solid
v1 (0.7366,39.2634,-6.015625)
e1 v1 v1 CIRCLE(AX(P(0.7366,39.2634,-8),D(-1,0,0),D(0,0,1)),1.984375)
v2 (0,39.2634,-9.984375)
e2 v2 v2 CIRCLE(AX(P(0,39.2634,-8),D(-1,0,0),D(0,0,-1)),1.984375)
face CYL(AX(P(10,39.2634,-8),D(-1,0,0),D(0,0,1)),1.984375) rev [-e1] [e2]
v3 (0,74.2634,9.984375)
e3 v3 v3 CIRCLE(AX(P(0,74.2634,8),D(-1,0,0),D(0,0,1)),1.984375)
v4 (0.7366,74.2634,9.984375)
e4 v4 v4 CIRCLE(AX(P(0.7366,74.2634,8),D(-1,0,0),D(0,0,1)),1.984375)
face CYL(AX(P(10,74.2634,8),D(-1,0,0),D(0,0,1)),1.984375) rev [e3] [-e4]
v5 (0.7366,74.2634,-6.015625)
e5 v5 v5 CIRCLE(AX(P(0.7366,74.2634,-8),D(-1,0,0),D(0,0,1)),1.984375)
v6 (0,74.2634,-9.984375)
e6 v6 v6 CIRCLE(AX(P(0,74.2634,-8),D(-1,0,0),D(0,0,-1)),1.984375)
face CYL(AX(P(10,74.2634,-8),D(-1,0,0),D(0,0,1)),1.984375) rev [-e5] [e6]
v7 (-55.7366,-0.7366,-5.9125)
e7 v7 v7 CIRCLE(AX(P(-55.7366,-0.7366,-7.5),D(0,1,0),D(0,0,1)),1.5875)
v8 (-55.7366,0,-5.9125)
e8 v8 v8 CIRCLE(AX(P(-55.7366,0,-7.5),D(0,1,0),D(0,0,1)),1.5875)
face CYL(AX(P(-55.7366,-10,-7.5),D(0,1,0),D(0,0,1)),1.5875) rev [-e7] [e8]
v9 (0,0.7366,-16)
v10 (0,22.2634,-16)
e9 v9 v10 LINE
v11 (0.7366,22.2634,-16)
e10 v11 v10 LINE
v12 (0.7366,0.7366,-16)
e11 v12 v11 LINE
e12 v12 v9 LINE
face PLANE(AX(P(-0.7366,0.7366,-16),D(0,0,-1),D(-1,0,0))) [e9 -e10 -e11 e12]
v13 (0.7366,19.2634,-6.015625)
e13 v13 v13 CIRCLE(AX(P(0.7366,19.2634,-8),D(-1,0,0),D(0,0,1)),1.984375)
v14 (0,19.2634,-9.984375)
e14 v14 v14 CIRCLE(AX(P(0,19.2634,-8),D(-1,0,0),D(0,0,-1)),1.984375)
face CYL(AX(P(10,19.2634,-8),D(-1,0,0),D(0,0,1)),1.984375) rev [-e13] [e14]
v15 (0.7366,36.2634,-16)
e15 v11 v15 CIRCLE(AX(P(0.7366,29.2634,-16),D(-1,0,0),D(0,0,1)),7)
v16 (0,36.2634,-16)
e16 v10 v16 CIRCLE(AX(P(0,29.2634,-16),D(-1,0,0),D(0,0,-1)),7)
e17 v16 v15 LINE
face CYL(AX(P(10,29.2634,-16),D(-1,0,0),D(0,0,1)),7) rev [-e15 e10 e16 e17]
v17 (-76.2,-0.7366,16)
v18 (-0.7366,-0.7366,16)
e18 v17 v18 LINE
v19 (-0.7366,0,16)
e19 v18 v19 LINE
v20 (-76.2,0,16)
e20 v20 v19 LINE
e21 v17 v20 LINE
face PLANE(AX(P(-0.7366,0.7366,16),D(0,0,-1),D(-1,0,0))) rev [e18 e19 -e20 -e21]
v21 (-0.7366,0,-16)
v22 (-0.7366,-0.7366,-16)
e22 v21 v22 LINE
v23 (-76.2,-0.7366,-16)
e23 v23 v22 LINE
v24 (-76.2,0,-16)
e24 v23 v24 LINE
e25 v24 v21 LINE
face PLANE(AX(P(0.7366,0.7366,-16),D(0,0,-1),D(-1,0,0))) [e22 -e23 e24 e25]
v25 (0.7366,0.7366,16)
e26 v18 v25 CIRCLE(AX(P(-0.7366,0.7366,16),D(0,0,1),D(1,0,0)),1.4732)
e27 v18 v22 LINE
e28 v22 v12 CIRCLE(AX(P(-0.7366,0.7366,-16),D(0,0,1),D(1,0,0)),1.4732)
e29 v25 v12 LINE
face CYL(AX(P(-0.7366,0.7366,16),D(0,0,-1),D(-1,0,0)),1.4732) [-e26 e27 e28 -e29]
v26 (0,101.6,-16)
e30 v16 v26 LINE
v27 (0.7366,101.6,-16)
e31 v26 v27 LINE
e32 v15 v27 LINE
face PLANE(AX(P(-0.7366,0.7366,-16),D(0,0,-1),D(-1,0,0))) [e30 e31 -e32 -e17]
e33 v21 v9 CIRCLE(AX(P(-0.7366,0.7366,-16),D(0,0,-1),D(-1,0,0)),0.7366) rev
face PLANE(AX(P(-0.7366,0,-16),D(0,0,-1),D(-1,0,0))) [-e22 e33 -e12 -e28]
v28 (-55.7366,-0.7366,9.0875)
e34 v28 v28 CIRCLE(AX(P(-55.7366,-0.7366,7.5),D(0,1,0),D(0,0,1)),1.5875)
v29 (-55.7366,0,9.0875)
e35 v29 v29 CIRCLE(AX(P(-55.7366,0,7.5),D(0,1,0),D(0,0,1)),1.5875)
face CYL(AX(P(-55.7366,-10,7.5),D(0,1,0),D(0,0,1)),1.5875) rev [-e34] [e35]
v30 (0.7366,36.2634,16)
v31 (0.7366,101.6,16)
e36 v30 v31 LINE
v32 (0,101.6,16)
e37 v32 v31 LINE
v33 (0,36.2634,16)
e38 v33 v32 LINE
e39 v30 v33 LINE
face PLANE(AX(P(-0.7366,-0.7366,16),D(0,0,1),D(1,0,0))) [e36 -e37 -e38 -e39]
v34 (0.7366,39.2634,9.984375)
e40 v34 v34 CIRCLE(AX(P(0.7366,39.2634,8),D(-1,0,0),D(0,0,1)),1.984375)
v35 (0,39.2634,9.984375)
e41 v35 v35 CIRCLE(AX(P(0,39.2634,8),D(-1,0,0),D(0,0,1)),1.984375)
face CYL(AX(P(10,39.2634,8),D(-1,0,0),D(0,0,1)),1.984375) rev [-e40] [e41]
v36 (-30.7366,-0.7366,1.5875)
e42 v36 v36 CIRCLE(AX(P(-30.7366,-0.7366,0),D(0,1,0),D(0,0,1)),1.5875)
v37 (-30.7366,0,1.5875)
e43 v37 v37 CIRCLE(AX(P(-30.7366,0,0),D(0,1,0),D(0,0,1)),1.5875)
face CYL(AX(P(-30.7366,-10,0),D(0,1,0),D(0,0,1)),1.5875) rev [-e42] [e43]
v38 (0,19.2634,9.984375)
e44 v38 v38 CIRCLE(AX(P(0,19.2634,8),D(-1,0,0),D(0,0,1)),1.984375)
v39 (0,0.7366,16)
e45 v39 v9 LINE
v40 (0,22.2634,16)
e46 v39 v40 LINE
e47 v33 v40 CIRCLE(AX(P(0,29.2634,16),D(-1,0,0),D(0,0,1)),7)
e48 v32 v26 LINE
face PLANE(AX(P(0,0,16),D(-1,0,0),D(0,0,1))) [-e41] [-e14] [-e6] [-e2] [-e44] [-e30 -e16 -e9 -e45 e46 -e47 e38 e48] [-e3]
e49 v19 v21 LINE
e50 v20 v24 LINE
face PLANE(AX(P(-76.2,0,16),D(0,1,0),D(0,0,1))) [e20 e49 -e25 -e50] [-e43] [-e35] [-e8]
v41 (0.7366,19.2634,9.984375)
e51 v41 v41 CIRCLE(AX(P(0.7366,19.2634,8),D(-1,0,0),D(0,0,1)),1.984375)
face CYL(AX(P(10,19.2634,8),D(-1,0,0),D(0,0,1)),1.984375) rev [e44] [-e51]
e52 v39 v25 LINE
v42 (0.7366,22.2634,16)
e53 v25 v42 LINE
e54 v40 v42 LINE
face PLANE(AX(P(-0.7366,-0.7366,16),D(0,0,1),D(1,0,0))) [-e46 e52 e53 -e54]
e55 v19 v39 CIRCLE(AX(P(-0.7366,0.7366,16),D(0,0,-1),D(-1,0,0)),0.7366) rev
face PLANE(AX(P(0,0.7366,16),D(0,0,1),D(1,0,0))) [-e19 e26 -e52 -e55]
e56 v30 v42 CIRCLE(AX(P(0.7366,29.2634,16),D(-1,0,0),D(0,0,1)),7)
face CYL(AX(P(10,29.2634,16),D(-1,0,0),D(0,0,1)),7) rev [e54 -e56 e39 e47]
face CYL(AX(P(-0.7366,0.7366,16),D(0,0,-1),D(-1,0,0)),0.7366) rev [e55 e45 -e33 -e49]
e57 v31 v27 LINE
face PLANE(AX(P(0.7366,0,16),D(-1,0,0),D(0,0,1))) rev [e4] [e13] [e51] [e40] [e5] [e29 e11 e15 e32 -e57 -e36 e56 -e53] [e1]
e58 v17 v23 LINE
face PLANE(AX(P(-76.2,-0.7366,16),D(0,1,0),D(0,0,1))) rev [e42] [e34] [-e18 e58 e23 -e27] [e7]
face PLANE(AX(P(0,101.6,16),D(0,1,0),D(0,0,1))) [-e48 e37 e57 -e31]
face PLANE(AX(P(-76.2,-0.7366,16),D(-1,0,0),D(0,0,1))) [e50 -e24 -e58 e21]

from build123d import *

# Parameters (mm, degrees)
BASE_FLANGE1_DEPTH = 16
SKETCH6_R          = 7
SKETCH6_R_2        = 1.984375
CUT_EXTRUDE1_DEPTH = 10
SKETCH7_R          = 1.5875
CUT_EXTRUDE2_DEPTH = 10


# Sheet-metal steps are written as plain solids
with BuildPart() as part:
    # Sketch1 → Base-Flange1 (new, symmetric)
    with BuildSketch(Plane.XY):
        with BuildLine():
            Line((-76.2, 0), (-0.7366, 0))
            ThreePointArc((-0.7366, 0), (-0.215745145, 0.215745145), (0, 0.7366))
            Line((0, 0.7366), (0, 101.6))
            Line((0, 101.6), (0.7366, 101.6))
            Line((0.7366, 101.6), (0.7366, 0.7366))
            ThreePointArc((0.7366, 0.7366), (0.30510971, -0.30510971), (-0.7366, -0.7366))
            Line((-0.7366, -0.7366), (-76.2, -0.7366))
            Line((-76.2, -0.7366), (-76.2, 0))
        make_face()
    extrude(amount=BASE_FLANGE1_DEPTH, both=True)

    # Sketch6 → Cut-Extrude1 (cut)
    with BuildSketch(Plane.ZY):
        with Locations((16, 29.2634)):
            Circle(SKETCH6_R)
        with Locations((8, 19.2634)):
            Circle(SKETCH6_R_2)
        with Locations((8, 39.2634)):
            Circle(SKETCH6_R_2)
        with Locations((8, 74.2634)):
            Circle(SKETCH6_R_2)
        with Locations((-8, 19.2634)):
            Circle(SKETCH6_R_2)
        with Locations((-16, 29.2634)):
            Circle(SKETCH6_R)
        with Locations((-8, 39.2634)):
            Circle(SKETCH6_R_2)
        with Locations((-8, 74.2634)):
            Circle(SKETCH6_R_2)
    extrude(amount=-CUT_EXTRUDE1_DEPTH, mode=Mode.SUBTRACT)

    # Sketch7 → Cut-Extrude2 (cut)
    with BuildSketch(Plane(origin=(0, 0, 0), x_dir=(1, 0, 0), z_dir=(0, 1, 0))):
        with Locations(Location((-30.7366, 0, 0), (0, 0, 270))):
            Circle(SKETCH7_R)
        with Locations(Location((-55.7366, -7.5, 0), (0, 0, 270))):
            Circle(SKETCH7_R)
        with Locations(Location((-55.7366, 7.5, 0), (0, 0, 270))):
            Circle(SKETCH7_R)
    extrude(amount=-CUT_EXTRUDE2_DEPTH, mode=Mode.SUBTRACT)


solid = part.part
